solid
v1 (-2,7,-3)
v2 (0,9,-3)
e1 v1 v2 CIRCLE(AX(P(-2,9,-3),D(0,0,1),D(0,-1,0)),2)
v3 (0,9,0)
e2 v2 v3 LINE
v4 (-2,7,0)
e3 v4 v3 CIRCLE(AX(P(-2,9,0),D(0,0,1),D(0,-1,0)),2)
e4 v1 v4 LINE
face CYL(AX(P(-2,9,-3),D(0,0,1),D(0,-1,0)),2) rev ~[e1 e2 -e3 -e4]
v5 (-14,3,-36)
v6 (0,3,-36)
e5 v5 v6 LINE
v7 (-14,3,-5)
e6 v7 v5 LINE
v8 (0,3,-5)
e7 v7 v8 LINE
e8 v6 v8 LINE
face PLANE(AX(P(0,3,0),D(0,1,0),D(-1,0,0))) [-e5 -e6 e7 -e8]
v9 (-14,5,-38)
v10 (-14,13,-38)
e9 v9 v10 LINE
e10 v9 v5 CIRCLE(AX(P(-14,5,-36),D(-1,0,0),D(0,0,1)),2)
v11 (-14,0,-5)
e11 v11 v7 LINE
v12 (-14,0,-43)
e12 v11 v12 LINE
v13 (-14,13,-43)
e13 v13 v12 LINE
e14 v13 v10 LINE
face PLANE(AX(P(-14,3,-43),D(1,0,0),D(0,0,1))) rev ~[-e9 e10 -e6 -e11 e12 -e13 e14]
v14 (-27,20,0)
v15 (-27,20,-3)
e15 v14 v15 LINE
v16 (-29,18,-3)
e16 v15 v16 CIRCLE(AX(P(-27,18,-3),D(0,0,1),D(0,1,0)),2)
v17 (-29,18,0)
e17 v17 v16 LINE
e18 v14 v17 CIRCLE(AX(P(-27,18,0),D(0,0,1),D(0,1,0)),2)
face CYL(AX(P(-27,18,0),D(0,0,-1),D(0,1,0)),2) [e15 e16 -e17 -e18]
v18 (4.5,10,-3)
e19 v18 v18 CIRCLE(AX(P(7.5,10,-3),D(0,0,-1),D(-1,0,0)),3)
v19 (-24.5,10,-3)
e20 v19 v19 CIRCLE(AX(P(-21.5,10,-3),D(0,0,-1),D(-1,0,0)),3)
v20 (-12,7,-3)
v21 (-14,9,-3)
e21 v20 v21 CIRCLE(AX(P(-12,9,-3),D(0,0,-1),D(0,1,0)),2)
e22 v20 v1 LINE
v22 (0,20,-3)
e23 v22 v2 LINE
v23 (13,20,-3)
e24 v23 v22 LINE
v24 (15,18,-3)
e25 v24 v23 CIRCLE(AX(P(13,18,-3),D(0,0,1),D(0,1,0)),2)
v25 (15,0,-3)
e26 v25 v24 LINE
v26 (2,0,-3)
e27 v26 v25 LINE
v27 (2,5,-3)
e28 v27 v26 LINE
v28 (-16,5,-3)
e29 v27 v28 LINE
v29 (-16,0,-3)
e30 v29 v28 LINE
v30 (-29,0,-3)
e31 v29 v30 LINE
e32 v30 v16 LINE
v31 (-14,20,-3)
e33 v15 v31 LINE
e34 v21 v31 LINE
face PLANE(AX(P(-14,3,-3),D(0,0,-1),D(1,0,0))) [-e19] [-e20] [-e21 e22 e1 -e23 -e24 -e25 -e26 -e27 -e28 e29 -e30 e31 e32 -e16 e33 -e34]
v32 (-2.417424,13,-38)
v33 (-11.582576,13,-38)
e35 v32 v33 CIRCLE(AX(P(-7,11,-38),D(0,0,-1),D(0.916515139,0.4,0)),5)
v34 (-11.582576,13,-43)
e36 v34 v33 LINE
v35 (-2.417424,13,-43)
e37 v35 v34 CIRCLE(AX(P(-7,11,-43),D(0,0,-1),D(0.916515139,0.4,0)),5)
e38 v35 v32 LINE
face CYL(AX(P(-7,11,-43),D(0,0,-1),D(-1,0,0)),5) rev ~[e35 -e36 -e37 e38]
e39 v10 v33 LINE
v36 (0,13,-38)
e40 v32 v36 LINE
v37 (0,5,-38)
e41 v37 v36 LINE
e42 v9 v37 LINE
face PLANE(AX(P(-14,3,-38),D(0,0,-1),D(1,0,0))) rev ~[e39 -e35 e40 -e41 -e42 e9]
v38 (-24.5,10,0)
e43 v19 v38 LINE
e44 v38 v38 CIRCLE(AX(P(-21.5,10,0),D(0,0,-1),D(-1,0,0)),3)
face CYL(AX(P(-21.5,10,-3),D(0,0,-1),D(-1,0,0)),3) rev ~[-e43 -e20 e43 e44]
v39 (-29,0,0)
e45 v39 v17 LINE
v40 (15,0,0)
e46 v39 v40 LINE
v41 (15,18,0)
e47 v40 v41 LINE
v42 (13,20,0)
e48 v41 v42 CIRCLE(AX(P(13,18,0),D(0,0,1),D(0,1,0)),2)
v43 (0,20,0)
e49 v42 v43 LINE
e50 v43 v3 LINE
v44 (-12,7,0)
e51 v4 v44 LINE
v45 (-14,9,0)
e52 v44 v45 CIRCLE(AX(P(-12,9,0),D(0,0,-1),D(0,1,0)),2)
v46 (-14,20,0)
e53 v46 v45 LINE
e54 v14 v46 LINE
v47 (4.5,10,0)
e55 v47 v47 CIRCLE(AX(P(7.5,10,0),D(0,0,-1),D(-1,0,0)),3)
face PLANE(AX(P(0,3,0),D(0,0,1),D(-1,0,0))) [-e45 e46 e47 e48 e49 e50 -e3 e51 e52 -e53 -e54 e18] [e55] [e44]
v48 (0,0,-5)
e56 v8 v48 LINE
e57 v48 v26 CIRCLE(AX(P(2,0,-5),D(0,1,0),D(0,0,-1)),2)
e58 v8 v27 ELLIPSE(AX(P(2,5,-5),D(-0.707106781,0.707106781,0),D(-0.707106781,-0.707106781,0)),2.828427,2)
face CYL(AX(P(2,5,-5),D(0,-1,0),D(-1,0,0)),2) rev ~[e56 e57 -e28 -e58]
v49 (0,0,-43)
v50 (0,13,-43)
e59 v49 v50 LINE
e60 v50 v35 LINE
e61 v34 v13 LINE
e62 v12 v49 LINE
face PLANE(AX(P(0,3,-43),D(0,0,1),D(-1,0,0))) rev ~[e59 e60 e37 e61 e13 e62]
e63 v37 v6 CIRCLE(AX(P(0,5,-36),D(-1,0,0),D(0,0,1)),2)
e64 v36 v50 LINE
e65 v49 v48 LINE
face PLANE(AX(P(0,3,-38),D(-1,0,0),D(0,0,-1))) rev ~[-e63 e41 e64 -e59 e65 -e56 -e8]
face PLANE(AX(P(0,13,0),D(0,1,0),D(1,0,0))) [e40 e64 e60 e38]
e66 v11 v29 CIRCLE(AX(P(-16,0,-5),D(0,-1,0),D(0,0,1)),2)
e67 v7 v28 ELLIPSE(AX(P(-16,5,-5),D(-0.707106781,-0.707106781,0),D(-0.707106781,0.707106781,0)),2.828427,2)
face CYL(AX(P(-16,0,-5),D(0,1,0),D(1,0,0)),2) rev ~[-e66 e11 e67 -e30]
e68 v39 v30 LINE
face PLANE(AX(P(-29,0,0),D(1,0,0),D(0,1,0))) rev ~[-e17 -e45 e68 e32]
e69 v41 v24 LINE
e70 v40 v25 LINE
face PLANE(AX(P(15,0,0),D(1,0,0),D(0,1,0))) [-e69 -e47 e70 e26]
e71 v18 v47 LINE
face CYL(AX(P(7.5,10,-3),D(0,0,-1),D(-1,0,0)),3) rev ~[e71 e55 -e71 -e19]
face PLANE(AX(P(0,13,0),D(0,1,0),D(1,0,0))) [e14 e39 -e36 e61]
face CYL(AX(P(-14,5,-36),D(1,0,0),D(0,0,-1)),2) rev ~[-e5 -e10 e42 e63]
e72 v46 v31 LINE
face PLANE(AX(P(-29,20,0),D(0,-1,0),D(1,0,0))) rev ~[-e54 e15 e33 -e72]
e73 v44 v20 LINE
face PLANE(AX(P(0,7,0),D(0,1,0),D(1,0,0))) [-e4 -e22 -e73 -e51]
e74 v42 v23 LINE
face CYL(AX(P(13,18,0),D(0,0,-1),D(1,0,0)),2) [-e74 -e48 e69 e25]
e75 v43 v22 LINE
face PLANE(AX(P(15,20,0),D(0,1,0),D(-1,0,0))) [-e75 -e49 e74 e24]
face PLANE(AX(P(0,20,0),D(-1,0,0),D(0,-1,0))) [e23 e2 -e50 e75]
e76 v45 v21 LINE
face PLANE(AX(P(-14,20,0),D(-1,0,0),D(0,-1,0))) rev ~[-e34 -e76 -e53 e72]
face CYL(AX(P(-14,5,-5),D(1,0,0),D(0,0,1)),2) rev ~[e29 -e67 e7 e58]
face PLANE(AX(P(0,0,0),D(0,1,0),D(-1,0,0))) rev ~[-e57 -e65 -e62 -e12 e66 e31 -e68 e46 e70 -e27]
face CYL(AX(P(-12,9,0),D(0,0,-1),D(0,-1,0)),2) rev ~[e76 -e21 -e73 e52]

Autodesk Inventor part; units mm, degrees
ref_plane "YZ Plane" through (0, 0, 0) normal (1, 0, 0) x (0, 1, 0)
ref_plane "XZ Plane" through (0, 0, 0) normal (0, 1, 0) x (-1, 0, 0)
ref_plane "XY Plane" through (0, 0, 0) normal (0, 0, 1) x (1, 0, 0)
sketch "Эскиз1" plane through (0, 0, 0) normal (0, 1, 0) x (-1, 0, 0)
  line L0 (0, 0) -> (14, 0)
  line L1 (14, 0) -> (14, -43)
  line L2 (14, -43) -> (0, -43)
  line L3 (0, -43) -> (0, 0)
  dimension "d1" = 43
  dimension "d2" = 14
extrude "Выдавливание1" add sketch "Эскиз1" along normal blind 3
sketch "Эскиз2" plane through (-14, 0, 0) normal (0, 0, 1) x (1, 0, 0)
  line L0 (0, 0) -> (0, 3) projected
  line L1 (0, 0) -> (-15, 0)
  line L2 (-15, 0) -> (-15, 20)
  line L3 (-15, 20) -> (0, 20)
  line L4 (0, 20) -> (0, 0)
  line L5 (14, 0) -> (0, 0) projected
  line L6 (14, 0) -> (29, 0)
  line L7 (29, 0) -> (29, 20)
  line L8 (29, 20) -> (14, 20)
  line L9 (14, 20) -> (14, 0)
  dimension "d5" = 15
  dimension "d6" = 20
  dimension "d7" = 15
  dimension "d8" = 20
extrude "Выдавливание2" add sketch "Эскиз2" against normal blind 3
sketch "Эскиз3" plane through (0, 3, 0) normal (0, 1, 0) x (1, 0, 0)
  line L0 (-14, 43) -> (-14, 3) projected
  line L1 (0, 0) -> (-14, 0)
  line L2 (-14, 0) -> (-14, 3)
  line L3 (-14, 3) -> (0, 3)
  line L4 (0, 3) -> (0, 0)
extrude "Выдавливание3" add sketch "Эскиз3" along normal blind 4
fillet "Сопряжение1" radius 2 4 edges at (-14, 7, -1.5) (0, 7, -1.5) (15, 20, -1.5) (-29, 20, -1.5)
fillet "Сопряжение2" radius 2 1 edges at (-7, 3, -3)
sketch "Эскиз5" plane through (0, 3, 0) normal (0, 1, 0) x (1, 0, 0)
  line L0 (0, 5) -> (0, 43) projected
  line L1 (0, 43) -> (-14, 43)
  line L2 (-14, 43) -> (-14, 38)
  line L3 (-14, 38) -> (0, 38)
  line L4 (0, 38) -> (0, 43)
  point P0 (0, 0)
  point P1 (0, 38)
  dimension "d21" = 14
  dimension "d22" = 5
extrude "Выдавливание5" add sketch "Эскиз5" along normal blind 10
sketch "Эскиз6" plane through (0, 0, -43) normal (0, 0, -1) x (-1, 0, 0)
  circle A0 centre (7, 11) radius 5
  line L0 (0, 0) -> (14, 0) projected
  line L1 (0, 13) -> (14, 13) projected
  line L2 (0, 0) -> (0, 13) projected
  point P0 (11.5826, 13)
  point P1 (2.4174, 13)
  dimension "d25" = 10
  dimension "d27" = 2
  dimension "d28" = 7
extrude "Выдавливание6" cut sketch "Эскиз6" against normal blind 7 contours A0 L1 picked at (7.9729, 10.9801)
fillet "Сопряжение3" radius 2 1 edges at (-7, 3, -38)
fillet "Сопряжение4" radius 2 2 edges at (0, 2.5, -3) (-14, 2.5, -3)
sketch "Эскиз7" plane through (-14, 0, -3) normal (0, 0, -1) x (-1, 0, 0)
  circle A0 centre (-21.5, 10) radius 3
  line L0 (-14, 9) -> (-14, 20) projected
  line L1 (-29, 0) -> (-16, 0) projected
  circle A1 centre (7.5, 10) radius 3
  line L2 (0, 20) -> (0, 9) projected
  line L3 (2, 0) -> (15, 0) projected
  point P0 (-14, 0)
  dimension "d33" = 6
  dimension "d34" = 7.5
  dimension "d35" = 10
  dimension "d36" = 6
  dimension "d37" = 7.5
  dimension "d38" = 10
extrude "Выдавливание7" cut sketch "Эскиз7" against normal blind 10
properties part number "TempSensorHolder"
